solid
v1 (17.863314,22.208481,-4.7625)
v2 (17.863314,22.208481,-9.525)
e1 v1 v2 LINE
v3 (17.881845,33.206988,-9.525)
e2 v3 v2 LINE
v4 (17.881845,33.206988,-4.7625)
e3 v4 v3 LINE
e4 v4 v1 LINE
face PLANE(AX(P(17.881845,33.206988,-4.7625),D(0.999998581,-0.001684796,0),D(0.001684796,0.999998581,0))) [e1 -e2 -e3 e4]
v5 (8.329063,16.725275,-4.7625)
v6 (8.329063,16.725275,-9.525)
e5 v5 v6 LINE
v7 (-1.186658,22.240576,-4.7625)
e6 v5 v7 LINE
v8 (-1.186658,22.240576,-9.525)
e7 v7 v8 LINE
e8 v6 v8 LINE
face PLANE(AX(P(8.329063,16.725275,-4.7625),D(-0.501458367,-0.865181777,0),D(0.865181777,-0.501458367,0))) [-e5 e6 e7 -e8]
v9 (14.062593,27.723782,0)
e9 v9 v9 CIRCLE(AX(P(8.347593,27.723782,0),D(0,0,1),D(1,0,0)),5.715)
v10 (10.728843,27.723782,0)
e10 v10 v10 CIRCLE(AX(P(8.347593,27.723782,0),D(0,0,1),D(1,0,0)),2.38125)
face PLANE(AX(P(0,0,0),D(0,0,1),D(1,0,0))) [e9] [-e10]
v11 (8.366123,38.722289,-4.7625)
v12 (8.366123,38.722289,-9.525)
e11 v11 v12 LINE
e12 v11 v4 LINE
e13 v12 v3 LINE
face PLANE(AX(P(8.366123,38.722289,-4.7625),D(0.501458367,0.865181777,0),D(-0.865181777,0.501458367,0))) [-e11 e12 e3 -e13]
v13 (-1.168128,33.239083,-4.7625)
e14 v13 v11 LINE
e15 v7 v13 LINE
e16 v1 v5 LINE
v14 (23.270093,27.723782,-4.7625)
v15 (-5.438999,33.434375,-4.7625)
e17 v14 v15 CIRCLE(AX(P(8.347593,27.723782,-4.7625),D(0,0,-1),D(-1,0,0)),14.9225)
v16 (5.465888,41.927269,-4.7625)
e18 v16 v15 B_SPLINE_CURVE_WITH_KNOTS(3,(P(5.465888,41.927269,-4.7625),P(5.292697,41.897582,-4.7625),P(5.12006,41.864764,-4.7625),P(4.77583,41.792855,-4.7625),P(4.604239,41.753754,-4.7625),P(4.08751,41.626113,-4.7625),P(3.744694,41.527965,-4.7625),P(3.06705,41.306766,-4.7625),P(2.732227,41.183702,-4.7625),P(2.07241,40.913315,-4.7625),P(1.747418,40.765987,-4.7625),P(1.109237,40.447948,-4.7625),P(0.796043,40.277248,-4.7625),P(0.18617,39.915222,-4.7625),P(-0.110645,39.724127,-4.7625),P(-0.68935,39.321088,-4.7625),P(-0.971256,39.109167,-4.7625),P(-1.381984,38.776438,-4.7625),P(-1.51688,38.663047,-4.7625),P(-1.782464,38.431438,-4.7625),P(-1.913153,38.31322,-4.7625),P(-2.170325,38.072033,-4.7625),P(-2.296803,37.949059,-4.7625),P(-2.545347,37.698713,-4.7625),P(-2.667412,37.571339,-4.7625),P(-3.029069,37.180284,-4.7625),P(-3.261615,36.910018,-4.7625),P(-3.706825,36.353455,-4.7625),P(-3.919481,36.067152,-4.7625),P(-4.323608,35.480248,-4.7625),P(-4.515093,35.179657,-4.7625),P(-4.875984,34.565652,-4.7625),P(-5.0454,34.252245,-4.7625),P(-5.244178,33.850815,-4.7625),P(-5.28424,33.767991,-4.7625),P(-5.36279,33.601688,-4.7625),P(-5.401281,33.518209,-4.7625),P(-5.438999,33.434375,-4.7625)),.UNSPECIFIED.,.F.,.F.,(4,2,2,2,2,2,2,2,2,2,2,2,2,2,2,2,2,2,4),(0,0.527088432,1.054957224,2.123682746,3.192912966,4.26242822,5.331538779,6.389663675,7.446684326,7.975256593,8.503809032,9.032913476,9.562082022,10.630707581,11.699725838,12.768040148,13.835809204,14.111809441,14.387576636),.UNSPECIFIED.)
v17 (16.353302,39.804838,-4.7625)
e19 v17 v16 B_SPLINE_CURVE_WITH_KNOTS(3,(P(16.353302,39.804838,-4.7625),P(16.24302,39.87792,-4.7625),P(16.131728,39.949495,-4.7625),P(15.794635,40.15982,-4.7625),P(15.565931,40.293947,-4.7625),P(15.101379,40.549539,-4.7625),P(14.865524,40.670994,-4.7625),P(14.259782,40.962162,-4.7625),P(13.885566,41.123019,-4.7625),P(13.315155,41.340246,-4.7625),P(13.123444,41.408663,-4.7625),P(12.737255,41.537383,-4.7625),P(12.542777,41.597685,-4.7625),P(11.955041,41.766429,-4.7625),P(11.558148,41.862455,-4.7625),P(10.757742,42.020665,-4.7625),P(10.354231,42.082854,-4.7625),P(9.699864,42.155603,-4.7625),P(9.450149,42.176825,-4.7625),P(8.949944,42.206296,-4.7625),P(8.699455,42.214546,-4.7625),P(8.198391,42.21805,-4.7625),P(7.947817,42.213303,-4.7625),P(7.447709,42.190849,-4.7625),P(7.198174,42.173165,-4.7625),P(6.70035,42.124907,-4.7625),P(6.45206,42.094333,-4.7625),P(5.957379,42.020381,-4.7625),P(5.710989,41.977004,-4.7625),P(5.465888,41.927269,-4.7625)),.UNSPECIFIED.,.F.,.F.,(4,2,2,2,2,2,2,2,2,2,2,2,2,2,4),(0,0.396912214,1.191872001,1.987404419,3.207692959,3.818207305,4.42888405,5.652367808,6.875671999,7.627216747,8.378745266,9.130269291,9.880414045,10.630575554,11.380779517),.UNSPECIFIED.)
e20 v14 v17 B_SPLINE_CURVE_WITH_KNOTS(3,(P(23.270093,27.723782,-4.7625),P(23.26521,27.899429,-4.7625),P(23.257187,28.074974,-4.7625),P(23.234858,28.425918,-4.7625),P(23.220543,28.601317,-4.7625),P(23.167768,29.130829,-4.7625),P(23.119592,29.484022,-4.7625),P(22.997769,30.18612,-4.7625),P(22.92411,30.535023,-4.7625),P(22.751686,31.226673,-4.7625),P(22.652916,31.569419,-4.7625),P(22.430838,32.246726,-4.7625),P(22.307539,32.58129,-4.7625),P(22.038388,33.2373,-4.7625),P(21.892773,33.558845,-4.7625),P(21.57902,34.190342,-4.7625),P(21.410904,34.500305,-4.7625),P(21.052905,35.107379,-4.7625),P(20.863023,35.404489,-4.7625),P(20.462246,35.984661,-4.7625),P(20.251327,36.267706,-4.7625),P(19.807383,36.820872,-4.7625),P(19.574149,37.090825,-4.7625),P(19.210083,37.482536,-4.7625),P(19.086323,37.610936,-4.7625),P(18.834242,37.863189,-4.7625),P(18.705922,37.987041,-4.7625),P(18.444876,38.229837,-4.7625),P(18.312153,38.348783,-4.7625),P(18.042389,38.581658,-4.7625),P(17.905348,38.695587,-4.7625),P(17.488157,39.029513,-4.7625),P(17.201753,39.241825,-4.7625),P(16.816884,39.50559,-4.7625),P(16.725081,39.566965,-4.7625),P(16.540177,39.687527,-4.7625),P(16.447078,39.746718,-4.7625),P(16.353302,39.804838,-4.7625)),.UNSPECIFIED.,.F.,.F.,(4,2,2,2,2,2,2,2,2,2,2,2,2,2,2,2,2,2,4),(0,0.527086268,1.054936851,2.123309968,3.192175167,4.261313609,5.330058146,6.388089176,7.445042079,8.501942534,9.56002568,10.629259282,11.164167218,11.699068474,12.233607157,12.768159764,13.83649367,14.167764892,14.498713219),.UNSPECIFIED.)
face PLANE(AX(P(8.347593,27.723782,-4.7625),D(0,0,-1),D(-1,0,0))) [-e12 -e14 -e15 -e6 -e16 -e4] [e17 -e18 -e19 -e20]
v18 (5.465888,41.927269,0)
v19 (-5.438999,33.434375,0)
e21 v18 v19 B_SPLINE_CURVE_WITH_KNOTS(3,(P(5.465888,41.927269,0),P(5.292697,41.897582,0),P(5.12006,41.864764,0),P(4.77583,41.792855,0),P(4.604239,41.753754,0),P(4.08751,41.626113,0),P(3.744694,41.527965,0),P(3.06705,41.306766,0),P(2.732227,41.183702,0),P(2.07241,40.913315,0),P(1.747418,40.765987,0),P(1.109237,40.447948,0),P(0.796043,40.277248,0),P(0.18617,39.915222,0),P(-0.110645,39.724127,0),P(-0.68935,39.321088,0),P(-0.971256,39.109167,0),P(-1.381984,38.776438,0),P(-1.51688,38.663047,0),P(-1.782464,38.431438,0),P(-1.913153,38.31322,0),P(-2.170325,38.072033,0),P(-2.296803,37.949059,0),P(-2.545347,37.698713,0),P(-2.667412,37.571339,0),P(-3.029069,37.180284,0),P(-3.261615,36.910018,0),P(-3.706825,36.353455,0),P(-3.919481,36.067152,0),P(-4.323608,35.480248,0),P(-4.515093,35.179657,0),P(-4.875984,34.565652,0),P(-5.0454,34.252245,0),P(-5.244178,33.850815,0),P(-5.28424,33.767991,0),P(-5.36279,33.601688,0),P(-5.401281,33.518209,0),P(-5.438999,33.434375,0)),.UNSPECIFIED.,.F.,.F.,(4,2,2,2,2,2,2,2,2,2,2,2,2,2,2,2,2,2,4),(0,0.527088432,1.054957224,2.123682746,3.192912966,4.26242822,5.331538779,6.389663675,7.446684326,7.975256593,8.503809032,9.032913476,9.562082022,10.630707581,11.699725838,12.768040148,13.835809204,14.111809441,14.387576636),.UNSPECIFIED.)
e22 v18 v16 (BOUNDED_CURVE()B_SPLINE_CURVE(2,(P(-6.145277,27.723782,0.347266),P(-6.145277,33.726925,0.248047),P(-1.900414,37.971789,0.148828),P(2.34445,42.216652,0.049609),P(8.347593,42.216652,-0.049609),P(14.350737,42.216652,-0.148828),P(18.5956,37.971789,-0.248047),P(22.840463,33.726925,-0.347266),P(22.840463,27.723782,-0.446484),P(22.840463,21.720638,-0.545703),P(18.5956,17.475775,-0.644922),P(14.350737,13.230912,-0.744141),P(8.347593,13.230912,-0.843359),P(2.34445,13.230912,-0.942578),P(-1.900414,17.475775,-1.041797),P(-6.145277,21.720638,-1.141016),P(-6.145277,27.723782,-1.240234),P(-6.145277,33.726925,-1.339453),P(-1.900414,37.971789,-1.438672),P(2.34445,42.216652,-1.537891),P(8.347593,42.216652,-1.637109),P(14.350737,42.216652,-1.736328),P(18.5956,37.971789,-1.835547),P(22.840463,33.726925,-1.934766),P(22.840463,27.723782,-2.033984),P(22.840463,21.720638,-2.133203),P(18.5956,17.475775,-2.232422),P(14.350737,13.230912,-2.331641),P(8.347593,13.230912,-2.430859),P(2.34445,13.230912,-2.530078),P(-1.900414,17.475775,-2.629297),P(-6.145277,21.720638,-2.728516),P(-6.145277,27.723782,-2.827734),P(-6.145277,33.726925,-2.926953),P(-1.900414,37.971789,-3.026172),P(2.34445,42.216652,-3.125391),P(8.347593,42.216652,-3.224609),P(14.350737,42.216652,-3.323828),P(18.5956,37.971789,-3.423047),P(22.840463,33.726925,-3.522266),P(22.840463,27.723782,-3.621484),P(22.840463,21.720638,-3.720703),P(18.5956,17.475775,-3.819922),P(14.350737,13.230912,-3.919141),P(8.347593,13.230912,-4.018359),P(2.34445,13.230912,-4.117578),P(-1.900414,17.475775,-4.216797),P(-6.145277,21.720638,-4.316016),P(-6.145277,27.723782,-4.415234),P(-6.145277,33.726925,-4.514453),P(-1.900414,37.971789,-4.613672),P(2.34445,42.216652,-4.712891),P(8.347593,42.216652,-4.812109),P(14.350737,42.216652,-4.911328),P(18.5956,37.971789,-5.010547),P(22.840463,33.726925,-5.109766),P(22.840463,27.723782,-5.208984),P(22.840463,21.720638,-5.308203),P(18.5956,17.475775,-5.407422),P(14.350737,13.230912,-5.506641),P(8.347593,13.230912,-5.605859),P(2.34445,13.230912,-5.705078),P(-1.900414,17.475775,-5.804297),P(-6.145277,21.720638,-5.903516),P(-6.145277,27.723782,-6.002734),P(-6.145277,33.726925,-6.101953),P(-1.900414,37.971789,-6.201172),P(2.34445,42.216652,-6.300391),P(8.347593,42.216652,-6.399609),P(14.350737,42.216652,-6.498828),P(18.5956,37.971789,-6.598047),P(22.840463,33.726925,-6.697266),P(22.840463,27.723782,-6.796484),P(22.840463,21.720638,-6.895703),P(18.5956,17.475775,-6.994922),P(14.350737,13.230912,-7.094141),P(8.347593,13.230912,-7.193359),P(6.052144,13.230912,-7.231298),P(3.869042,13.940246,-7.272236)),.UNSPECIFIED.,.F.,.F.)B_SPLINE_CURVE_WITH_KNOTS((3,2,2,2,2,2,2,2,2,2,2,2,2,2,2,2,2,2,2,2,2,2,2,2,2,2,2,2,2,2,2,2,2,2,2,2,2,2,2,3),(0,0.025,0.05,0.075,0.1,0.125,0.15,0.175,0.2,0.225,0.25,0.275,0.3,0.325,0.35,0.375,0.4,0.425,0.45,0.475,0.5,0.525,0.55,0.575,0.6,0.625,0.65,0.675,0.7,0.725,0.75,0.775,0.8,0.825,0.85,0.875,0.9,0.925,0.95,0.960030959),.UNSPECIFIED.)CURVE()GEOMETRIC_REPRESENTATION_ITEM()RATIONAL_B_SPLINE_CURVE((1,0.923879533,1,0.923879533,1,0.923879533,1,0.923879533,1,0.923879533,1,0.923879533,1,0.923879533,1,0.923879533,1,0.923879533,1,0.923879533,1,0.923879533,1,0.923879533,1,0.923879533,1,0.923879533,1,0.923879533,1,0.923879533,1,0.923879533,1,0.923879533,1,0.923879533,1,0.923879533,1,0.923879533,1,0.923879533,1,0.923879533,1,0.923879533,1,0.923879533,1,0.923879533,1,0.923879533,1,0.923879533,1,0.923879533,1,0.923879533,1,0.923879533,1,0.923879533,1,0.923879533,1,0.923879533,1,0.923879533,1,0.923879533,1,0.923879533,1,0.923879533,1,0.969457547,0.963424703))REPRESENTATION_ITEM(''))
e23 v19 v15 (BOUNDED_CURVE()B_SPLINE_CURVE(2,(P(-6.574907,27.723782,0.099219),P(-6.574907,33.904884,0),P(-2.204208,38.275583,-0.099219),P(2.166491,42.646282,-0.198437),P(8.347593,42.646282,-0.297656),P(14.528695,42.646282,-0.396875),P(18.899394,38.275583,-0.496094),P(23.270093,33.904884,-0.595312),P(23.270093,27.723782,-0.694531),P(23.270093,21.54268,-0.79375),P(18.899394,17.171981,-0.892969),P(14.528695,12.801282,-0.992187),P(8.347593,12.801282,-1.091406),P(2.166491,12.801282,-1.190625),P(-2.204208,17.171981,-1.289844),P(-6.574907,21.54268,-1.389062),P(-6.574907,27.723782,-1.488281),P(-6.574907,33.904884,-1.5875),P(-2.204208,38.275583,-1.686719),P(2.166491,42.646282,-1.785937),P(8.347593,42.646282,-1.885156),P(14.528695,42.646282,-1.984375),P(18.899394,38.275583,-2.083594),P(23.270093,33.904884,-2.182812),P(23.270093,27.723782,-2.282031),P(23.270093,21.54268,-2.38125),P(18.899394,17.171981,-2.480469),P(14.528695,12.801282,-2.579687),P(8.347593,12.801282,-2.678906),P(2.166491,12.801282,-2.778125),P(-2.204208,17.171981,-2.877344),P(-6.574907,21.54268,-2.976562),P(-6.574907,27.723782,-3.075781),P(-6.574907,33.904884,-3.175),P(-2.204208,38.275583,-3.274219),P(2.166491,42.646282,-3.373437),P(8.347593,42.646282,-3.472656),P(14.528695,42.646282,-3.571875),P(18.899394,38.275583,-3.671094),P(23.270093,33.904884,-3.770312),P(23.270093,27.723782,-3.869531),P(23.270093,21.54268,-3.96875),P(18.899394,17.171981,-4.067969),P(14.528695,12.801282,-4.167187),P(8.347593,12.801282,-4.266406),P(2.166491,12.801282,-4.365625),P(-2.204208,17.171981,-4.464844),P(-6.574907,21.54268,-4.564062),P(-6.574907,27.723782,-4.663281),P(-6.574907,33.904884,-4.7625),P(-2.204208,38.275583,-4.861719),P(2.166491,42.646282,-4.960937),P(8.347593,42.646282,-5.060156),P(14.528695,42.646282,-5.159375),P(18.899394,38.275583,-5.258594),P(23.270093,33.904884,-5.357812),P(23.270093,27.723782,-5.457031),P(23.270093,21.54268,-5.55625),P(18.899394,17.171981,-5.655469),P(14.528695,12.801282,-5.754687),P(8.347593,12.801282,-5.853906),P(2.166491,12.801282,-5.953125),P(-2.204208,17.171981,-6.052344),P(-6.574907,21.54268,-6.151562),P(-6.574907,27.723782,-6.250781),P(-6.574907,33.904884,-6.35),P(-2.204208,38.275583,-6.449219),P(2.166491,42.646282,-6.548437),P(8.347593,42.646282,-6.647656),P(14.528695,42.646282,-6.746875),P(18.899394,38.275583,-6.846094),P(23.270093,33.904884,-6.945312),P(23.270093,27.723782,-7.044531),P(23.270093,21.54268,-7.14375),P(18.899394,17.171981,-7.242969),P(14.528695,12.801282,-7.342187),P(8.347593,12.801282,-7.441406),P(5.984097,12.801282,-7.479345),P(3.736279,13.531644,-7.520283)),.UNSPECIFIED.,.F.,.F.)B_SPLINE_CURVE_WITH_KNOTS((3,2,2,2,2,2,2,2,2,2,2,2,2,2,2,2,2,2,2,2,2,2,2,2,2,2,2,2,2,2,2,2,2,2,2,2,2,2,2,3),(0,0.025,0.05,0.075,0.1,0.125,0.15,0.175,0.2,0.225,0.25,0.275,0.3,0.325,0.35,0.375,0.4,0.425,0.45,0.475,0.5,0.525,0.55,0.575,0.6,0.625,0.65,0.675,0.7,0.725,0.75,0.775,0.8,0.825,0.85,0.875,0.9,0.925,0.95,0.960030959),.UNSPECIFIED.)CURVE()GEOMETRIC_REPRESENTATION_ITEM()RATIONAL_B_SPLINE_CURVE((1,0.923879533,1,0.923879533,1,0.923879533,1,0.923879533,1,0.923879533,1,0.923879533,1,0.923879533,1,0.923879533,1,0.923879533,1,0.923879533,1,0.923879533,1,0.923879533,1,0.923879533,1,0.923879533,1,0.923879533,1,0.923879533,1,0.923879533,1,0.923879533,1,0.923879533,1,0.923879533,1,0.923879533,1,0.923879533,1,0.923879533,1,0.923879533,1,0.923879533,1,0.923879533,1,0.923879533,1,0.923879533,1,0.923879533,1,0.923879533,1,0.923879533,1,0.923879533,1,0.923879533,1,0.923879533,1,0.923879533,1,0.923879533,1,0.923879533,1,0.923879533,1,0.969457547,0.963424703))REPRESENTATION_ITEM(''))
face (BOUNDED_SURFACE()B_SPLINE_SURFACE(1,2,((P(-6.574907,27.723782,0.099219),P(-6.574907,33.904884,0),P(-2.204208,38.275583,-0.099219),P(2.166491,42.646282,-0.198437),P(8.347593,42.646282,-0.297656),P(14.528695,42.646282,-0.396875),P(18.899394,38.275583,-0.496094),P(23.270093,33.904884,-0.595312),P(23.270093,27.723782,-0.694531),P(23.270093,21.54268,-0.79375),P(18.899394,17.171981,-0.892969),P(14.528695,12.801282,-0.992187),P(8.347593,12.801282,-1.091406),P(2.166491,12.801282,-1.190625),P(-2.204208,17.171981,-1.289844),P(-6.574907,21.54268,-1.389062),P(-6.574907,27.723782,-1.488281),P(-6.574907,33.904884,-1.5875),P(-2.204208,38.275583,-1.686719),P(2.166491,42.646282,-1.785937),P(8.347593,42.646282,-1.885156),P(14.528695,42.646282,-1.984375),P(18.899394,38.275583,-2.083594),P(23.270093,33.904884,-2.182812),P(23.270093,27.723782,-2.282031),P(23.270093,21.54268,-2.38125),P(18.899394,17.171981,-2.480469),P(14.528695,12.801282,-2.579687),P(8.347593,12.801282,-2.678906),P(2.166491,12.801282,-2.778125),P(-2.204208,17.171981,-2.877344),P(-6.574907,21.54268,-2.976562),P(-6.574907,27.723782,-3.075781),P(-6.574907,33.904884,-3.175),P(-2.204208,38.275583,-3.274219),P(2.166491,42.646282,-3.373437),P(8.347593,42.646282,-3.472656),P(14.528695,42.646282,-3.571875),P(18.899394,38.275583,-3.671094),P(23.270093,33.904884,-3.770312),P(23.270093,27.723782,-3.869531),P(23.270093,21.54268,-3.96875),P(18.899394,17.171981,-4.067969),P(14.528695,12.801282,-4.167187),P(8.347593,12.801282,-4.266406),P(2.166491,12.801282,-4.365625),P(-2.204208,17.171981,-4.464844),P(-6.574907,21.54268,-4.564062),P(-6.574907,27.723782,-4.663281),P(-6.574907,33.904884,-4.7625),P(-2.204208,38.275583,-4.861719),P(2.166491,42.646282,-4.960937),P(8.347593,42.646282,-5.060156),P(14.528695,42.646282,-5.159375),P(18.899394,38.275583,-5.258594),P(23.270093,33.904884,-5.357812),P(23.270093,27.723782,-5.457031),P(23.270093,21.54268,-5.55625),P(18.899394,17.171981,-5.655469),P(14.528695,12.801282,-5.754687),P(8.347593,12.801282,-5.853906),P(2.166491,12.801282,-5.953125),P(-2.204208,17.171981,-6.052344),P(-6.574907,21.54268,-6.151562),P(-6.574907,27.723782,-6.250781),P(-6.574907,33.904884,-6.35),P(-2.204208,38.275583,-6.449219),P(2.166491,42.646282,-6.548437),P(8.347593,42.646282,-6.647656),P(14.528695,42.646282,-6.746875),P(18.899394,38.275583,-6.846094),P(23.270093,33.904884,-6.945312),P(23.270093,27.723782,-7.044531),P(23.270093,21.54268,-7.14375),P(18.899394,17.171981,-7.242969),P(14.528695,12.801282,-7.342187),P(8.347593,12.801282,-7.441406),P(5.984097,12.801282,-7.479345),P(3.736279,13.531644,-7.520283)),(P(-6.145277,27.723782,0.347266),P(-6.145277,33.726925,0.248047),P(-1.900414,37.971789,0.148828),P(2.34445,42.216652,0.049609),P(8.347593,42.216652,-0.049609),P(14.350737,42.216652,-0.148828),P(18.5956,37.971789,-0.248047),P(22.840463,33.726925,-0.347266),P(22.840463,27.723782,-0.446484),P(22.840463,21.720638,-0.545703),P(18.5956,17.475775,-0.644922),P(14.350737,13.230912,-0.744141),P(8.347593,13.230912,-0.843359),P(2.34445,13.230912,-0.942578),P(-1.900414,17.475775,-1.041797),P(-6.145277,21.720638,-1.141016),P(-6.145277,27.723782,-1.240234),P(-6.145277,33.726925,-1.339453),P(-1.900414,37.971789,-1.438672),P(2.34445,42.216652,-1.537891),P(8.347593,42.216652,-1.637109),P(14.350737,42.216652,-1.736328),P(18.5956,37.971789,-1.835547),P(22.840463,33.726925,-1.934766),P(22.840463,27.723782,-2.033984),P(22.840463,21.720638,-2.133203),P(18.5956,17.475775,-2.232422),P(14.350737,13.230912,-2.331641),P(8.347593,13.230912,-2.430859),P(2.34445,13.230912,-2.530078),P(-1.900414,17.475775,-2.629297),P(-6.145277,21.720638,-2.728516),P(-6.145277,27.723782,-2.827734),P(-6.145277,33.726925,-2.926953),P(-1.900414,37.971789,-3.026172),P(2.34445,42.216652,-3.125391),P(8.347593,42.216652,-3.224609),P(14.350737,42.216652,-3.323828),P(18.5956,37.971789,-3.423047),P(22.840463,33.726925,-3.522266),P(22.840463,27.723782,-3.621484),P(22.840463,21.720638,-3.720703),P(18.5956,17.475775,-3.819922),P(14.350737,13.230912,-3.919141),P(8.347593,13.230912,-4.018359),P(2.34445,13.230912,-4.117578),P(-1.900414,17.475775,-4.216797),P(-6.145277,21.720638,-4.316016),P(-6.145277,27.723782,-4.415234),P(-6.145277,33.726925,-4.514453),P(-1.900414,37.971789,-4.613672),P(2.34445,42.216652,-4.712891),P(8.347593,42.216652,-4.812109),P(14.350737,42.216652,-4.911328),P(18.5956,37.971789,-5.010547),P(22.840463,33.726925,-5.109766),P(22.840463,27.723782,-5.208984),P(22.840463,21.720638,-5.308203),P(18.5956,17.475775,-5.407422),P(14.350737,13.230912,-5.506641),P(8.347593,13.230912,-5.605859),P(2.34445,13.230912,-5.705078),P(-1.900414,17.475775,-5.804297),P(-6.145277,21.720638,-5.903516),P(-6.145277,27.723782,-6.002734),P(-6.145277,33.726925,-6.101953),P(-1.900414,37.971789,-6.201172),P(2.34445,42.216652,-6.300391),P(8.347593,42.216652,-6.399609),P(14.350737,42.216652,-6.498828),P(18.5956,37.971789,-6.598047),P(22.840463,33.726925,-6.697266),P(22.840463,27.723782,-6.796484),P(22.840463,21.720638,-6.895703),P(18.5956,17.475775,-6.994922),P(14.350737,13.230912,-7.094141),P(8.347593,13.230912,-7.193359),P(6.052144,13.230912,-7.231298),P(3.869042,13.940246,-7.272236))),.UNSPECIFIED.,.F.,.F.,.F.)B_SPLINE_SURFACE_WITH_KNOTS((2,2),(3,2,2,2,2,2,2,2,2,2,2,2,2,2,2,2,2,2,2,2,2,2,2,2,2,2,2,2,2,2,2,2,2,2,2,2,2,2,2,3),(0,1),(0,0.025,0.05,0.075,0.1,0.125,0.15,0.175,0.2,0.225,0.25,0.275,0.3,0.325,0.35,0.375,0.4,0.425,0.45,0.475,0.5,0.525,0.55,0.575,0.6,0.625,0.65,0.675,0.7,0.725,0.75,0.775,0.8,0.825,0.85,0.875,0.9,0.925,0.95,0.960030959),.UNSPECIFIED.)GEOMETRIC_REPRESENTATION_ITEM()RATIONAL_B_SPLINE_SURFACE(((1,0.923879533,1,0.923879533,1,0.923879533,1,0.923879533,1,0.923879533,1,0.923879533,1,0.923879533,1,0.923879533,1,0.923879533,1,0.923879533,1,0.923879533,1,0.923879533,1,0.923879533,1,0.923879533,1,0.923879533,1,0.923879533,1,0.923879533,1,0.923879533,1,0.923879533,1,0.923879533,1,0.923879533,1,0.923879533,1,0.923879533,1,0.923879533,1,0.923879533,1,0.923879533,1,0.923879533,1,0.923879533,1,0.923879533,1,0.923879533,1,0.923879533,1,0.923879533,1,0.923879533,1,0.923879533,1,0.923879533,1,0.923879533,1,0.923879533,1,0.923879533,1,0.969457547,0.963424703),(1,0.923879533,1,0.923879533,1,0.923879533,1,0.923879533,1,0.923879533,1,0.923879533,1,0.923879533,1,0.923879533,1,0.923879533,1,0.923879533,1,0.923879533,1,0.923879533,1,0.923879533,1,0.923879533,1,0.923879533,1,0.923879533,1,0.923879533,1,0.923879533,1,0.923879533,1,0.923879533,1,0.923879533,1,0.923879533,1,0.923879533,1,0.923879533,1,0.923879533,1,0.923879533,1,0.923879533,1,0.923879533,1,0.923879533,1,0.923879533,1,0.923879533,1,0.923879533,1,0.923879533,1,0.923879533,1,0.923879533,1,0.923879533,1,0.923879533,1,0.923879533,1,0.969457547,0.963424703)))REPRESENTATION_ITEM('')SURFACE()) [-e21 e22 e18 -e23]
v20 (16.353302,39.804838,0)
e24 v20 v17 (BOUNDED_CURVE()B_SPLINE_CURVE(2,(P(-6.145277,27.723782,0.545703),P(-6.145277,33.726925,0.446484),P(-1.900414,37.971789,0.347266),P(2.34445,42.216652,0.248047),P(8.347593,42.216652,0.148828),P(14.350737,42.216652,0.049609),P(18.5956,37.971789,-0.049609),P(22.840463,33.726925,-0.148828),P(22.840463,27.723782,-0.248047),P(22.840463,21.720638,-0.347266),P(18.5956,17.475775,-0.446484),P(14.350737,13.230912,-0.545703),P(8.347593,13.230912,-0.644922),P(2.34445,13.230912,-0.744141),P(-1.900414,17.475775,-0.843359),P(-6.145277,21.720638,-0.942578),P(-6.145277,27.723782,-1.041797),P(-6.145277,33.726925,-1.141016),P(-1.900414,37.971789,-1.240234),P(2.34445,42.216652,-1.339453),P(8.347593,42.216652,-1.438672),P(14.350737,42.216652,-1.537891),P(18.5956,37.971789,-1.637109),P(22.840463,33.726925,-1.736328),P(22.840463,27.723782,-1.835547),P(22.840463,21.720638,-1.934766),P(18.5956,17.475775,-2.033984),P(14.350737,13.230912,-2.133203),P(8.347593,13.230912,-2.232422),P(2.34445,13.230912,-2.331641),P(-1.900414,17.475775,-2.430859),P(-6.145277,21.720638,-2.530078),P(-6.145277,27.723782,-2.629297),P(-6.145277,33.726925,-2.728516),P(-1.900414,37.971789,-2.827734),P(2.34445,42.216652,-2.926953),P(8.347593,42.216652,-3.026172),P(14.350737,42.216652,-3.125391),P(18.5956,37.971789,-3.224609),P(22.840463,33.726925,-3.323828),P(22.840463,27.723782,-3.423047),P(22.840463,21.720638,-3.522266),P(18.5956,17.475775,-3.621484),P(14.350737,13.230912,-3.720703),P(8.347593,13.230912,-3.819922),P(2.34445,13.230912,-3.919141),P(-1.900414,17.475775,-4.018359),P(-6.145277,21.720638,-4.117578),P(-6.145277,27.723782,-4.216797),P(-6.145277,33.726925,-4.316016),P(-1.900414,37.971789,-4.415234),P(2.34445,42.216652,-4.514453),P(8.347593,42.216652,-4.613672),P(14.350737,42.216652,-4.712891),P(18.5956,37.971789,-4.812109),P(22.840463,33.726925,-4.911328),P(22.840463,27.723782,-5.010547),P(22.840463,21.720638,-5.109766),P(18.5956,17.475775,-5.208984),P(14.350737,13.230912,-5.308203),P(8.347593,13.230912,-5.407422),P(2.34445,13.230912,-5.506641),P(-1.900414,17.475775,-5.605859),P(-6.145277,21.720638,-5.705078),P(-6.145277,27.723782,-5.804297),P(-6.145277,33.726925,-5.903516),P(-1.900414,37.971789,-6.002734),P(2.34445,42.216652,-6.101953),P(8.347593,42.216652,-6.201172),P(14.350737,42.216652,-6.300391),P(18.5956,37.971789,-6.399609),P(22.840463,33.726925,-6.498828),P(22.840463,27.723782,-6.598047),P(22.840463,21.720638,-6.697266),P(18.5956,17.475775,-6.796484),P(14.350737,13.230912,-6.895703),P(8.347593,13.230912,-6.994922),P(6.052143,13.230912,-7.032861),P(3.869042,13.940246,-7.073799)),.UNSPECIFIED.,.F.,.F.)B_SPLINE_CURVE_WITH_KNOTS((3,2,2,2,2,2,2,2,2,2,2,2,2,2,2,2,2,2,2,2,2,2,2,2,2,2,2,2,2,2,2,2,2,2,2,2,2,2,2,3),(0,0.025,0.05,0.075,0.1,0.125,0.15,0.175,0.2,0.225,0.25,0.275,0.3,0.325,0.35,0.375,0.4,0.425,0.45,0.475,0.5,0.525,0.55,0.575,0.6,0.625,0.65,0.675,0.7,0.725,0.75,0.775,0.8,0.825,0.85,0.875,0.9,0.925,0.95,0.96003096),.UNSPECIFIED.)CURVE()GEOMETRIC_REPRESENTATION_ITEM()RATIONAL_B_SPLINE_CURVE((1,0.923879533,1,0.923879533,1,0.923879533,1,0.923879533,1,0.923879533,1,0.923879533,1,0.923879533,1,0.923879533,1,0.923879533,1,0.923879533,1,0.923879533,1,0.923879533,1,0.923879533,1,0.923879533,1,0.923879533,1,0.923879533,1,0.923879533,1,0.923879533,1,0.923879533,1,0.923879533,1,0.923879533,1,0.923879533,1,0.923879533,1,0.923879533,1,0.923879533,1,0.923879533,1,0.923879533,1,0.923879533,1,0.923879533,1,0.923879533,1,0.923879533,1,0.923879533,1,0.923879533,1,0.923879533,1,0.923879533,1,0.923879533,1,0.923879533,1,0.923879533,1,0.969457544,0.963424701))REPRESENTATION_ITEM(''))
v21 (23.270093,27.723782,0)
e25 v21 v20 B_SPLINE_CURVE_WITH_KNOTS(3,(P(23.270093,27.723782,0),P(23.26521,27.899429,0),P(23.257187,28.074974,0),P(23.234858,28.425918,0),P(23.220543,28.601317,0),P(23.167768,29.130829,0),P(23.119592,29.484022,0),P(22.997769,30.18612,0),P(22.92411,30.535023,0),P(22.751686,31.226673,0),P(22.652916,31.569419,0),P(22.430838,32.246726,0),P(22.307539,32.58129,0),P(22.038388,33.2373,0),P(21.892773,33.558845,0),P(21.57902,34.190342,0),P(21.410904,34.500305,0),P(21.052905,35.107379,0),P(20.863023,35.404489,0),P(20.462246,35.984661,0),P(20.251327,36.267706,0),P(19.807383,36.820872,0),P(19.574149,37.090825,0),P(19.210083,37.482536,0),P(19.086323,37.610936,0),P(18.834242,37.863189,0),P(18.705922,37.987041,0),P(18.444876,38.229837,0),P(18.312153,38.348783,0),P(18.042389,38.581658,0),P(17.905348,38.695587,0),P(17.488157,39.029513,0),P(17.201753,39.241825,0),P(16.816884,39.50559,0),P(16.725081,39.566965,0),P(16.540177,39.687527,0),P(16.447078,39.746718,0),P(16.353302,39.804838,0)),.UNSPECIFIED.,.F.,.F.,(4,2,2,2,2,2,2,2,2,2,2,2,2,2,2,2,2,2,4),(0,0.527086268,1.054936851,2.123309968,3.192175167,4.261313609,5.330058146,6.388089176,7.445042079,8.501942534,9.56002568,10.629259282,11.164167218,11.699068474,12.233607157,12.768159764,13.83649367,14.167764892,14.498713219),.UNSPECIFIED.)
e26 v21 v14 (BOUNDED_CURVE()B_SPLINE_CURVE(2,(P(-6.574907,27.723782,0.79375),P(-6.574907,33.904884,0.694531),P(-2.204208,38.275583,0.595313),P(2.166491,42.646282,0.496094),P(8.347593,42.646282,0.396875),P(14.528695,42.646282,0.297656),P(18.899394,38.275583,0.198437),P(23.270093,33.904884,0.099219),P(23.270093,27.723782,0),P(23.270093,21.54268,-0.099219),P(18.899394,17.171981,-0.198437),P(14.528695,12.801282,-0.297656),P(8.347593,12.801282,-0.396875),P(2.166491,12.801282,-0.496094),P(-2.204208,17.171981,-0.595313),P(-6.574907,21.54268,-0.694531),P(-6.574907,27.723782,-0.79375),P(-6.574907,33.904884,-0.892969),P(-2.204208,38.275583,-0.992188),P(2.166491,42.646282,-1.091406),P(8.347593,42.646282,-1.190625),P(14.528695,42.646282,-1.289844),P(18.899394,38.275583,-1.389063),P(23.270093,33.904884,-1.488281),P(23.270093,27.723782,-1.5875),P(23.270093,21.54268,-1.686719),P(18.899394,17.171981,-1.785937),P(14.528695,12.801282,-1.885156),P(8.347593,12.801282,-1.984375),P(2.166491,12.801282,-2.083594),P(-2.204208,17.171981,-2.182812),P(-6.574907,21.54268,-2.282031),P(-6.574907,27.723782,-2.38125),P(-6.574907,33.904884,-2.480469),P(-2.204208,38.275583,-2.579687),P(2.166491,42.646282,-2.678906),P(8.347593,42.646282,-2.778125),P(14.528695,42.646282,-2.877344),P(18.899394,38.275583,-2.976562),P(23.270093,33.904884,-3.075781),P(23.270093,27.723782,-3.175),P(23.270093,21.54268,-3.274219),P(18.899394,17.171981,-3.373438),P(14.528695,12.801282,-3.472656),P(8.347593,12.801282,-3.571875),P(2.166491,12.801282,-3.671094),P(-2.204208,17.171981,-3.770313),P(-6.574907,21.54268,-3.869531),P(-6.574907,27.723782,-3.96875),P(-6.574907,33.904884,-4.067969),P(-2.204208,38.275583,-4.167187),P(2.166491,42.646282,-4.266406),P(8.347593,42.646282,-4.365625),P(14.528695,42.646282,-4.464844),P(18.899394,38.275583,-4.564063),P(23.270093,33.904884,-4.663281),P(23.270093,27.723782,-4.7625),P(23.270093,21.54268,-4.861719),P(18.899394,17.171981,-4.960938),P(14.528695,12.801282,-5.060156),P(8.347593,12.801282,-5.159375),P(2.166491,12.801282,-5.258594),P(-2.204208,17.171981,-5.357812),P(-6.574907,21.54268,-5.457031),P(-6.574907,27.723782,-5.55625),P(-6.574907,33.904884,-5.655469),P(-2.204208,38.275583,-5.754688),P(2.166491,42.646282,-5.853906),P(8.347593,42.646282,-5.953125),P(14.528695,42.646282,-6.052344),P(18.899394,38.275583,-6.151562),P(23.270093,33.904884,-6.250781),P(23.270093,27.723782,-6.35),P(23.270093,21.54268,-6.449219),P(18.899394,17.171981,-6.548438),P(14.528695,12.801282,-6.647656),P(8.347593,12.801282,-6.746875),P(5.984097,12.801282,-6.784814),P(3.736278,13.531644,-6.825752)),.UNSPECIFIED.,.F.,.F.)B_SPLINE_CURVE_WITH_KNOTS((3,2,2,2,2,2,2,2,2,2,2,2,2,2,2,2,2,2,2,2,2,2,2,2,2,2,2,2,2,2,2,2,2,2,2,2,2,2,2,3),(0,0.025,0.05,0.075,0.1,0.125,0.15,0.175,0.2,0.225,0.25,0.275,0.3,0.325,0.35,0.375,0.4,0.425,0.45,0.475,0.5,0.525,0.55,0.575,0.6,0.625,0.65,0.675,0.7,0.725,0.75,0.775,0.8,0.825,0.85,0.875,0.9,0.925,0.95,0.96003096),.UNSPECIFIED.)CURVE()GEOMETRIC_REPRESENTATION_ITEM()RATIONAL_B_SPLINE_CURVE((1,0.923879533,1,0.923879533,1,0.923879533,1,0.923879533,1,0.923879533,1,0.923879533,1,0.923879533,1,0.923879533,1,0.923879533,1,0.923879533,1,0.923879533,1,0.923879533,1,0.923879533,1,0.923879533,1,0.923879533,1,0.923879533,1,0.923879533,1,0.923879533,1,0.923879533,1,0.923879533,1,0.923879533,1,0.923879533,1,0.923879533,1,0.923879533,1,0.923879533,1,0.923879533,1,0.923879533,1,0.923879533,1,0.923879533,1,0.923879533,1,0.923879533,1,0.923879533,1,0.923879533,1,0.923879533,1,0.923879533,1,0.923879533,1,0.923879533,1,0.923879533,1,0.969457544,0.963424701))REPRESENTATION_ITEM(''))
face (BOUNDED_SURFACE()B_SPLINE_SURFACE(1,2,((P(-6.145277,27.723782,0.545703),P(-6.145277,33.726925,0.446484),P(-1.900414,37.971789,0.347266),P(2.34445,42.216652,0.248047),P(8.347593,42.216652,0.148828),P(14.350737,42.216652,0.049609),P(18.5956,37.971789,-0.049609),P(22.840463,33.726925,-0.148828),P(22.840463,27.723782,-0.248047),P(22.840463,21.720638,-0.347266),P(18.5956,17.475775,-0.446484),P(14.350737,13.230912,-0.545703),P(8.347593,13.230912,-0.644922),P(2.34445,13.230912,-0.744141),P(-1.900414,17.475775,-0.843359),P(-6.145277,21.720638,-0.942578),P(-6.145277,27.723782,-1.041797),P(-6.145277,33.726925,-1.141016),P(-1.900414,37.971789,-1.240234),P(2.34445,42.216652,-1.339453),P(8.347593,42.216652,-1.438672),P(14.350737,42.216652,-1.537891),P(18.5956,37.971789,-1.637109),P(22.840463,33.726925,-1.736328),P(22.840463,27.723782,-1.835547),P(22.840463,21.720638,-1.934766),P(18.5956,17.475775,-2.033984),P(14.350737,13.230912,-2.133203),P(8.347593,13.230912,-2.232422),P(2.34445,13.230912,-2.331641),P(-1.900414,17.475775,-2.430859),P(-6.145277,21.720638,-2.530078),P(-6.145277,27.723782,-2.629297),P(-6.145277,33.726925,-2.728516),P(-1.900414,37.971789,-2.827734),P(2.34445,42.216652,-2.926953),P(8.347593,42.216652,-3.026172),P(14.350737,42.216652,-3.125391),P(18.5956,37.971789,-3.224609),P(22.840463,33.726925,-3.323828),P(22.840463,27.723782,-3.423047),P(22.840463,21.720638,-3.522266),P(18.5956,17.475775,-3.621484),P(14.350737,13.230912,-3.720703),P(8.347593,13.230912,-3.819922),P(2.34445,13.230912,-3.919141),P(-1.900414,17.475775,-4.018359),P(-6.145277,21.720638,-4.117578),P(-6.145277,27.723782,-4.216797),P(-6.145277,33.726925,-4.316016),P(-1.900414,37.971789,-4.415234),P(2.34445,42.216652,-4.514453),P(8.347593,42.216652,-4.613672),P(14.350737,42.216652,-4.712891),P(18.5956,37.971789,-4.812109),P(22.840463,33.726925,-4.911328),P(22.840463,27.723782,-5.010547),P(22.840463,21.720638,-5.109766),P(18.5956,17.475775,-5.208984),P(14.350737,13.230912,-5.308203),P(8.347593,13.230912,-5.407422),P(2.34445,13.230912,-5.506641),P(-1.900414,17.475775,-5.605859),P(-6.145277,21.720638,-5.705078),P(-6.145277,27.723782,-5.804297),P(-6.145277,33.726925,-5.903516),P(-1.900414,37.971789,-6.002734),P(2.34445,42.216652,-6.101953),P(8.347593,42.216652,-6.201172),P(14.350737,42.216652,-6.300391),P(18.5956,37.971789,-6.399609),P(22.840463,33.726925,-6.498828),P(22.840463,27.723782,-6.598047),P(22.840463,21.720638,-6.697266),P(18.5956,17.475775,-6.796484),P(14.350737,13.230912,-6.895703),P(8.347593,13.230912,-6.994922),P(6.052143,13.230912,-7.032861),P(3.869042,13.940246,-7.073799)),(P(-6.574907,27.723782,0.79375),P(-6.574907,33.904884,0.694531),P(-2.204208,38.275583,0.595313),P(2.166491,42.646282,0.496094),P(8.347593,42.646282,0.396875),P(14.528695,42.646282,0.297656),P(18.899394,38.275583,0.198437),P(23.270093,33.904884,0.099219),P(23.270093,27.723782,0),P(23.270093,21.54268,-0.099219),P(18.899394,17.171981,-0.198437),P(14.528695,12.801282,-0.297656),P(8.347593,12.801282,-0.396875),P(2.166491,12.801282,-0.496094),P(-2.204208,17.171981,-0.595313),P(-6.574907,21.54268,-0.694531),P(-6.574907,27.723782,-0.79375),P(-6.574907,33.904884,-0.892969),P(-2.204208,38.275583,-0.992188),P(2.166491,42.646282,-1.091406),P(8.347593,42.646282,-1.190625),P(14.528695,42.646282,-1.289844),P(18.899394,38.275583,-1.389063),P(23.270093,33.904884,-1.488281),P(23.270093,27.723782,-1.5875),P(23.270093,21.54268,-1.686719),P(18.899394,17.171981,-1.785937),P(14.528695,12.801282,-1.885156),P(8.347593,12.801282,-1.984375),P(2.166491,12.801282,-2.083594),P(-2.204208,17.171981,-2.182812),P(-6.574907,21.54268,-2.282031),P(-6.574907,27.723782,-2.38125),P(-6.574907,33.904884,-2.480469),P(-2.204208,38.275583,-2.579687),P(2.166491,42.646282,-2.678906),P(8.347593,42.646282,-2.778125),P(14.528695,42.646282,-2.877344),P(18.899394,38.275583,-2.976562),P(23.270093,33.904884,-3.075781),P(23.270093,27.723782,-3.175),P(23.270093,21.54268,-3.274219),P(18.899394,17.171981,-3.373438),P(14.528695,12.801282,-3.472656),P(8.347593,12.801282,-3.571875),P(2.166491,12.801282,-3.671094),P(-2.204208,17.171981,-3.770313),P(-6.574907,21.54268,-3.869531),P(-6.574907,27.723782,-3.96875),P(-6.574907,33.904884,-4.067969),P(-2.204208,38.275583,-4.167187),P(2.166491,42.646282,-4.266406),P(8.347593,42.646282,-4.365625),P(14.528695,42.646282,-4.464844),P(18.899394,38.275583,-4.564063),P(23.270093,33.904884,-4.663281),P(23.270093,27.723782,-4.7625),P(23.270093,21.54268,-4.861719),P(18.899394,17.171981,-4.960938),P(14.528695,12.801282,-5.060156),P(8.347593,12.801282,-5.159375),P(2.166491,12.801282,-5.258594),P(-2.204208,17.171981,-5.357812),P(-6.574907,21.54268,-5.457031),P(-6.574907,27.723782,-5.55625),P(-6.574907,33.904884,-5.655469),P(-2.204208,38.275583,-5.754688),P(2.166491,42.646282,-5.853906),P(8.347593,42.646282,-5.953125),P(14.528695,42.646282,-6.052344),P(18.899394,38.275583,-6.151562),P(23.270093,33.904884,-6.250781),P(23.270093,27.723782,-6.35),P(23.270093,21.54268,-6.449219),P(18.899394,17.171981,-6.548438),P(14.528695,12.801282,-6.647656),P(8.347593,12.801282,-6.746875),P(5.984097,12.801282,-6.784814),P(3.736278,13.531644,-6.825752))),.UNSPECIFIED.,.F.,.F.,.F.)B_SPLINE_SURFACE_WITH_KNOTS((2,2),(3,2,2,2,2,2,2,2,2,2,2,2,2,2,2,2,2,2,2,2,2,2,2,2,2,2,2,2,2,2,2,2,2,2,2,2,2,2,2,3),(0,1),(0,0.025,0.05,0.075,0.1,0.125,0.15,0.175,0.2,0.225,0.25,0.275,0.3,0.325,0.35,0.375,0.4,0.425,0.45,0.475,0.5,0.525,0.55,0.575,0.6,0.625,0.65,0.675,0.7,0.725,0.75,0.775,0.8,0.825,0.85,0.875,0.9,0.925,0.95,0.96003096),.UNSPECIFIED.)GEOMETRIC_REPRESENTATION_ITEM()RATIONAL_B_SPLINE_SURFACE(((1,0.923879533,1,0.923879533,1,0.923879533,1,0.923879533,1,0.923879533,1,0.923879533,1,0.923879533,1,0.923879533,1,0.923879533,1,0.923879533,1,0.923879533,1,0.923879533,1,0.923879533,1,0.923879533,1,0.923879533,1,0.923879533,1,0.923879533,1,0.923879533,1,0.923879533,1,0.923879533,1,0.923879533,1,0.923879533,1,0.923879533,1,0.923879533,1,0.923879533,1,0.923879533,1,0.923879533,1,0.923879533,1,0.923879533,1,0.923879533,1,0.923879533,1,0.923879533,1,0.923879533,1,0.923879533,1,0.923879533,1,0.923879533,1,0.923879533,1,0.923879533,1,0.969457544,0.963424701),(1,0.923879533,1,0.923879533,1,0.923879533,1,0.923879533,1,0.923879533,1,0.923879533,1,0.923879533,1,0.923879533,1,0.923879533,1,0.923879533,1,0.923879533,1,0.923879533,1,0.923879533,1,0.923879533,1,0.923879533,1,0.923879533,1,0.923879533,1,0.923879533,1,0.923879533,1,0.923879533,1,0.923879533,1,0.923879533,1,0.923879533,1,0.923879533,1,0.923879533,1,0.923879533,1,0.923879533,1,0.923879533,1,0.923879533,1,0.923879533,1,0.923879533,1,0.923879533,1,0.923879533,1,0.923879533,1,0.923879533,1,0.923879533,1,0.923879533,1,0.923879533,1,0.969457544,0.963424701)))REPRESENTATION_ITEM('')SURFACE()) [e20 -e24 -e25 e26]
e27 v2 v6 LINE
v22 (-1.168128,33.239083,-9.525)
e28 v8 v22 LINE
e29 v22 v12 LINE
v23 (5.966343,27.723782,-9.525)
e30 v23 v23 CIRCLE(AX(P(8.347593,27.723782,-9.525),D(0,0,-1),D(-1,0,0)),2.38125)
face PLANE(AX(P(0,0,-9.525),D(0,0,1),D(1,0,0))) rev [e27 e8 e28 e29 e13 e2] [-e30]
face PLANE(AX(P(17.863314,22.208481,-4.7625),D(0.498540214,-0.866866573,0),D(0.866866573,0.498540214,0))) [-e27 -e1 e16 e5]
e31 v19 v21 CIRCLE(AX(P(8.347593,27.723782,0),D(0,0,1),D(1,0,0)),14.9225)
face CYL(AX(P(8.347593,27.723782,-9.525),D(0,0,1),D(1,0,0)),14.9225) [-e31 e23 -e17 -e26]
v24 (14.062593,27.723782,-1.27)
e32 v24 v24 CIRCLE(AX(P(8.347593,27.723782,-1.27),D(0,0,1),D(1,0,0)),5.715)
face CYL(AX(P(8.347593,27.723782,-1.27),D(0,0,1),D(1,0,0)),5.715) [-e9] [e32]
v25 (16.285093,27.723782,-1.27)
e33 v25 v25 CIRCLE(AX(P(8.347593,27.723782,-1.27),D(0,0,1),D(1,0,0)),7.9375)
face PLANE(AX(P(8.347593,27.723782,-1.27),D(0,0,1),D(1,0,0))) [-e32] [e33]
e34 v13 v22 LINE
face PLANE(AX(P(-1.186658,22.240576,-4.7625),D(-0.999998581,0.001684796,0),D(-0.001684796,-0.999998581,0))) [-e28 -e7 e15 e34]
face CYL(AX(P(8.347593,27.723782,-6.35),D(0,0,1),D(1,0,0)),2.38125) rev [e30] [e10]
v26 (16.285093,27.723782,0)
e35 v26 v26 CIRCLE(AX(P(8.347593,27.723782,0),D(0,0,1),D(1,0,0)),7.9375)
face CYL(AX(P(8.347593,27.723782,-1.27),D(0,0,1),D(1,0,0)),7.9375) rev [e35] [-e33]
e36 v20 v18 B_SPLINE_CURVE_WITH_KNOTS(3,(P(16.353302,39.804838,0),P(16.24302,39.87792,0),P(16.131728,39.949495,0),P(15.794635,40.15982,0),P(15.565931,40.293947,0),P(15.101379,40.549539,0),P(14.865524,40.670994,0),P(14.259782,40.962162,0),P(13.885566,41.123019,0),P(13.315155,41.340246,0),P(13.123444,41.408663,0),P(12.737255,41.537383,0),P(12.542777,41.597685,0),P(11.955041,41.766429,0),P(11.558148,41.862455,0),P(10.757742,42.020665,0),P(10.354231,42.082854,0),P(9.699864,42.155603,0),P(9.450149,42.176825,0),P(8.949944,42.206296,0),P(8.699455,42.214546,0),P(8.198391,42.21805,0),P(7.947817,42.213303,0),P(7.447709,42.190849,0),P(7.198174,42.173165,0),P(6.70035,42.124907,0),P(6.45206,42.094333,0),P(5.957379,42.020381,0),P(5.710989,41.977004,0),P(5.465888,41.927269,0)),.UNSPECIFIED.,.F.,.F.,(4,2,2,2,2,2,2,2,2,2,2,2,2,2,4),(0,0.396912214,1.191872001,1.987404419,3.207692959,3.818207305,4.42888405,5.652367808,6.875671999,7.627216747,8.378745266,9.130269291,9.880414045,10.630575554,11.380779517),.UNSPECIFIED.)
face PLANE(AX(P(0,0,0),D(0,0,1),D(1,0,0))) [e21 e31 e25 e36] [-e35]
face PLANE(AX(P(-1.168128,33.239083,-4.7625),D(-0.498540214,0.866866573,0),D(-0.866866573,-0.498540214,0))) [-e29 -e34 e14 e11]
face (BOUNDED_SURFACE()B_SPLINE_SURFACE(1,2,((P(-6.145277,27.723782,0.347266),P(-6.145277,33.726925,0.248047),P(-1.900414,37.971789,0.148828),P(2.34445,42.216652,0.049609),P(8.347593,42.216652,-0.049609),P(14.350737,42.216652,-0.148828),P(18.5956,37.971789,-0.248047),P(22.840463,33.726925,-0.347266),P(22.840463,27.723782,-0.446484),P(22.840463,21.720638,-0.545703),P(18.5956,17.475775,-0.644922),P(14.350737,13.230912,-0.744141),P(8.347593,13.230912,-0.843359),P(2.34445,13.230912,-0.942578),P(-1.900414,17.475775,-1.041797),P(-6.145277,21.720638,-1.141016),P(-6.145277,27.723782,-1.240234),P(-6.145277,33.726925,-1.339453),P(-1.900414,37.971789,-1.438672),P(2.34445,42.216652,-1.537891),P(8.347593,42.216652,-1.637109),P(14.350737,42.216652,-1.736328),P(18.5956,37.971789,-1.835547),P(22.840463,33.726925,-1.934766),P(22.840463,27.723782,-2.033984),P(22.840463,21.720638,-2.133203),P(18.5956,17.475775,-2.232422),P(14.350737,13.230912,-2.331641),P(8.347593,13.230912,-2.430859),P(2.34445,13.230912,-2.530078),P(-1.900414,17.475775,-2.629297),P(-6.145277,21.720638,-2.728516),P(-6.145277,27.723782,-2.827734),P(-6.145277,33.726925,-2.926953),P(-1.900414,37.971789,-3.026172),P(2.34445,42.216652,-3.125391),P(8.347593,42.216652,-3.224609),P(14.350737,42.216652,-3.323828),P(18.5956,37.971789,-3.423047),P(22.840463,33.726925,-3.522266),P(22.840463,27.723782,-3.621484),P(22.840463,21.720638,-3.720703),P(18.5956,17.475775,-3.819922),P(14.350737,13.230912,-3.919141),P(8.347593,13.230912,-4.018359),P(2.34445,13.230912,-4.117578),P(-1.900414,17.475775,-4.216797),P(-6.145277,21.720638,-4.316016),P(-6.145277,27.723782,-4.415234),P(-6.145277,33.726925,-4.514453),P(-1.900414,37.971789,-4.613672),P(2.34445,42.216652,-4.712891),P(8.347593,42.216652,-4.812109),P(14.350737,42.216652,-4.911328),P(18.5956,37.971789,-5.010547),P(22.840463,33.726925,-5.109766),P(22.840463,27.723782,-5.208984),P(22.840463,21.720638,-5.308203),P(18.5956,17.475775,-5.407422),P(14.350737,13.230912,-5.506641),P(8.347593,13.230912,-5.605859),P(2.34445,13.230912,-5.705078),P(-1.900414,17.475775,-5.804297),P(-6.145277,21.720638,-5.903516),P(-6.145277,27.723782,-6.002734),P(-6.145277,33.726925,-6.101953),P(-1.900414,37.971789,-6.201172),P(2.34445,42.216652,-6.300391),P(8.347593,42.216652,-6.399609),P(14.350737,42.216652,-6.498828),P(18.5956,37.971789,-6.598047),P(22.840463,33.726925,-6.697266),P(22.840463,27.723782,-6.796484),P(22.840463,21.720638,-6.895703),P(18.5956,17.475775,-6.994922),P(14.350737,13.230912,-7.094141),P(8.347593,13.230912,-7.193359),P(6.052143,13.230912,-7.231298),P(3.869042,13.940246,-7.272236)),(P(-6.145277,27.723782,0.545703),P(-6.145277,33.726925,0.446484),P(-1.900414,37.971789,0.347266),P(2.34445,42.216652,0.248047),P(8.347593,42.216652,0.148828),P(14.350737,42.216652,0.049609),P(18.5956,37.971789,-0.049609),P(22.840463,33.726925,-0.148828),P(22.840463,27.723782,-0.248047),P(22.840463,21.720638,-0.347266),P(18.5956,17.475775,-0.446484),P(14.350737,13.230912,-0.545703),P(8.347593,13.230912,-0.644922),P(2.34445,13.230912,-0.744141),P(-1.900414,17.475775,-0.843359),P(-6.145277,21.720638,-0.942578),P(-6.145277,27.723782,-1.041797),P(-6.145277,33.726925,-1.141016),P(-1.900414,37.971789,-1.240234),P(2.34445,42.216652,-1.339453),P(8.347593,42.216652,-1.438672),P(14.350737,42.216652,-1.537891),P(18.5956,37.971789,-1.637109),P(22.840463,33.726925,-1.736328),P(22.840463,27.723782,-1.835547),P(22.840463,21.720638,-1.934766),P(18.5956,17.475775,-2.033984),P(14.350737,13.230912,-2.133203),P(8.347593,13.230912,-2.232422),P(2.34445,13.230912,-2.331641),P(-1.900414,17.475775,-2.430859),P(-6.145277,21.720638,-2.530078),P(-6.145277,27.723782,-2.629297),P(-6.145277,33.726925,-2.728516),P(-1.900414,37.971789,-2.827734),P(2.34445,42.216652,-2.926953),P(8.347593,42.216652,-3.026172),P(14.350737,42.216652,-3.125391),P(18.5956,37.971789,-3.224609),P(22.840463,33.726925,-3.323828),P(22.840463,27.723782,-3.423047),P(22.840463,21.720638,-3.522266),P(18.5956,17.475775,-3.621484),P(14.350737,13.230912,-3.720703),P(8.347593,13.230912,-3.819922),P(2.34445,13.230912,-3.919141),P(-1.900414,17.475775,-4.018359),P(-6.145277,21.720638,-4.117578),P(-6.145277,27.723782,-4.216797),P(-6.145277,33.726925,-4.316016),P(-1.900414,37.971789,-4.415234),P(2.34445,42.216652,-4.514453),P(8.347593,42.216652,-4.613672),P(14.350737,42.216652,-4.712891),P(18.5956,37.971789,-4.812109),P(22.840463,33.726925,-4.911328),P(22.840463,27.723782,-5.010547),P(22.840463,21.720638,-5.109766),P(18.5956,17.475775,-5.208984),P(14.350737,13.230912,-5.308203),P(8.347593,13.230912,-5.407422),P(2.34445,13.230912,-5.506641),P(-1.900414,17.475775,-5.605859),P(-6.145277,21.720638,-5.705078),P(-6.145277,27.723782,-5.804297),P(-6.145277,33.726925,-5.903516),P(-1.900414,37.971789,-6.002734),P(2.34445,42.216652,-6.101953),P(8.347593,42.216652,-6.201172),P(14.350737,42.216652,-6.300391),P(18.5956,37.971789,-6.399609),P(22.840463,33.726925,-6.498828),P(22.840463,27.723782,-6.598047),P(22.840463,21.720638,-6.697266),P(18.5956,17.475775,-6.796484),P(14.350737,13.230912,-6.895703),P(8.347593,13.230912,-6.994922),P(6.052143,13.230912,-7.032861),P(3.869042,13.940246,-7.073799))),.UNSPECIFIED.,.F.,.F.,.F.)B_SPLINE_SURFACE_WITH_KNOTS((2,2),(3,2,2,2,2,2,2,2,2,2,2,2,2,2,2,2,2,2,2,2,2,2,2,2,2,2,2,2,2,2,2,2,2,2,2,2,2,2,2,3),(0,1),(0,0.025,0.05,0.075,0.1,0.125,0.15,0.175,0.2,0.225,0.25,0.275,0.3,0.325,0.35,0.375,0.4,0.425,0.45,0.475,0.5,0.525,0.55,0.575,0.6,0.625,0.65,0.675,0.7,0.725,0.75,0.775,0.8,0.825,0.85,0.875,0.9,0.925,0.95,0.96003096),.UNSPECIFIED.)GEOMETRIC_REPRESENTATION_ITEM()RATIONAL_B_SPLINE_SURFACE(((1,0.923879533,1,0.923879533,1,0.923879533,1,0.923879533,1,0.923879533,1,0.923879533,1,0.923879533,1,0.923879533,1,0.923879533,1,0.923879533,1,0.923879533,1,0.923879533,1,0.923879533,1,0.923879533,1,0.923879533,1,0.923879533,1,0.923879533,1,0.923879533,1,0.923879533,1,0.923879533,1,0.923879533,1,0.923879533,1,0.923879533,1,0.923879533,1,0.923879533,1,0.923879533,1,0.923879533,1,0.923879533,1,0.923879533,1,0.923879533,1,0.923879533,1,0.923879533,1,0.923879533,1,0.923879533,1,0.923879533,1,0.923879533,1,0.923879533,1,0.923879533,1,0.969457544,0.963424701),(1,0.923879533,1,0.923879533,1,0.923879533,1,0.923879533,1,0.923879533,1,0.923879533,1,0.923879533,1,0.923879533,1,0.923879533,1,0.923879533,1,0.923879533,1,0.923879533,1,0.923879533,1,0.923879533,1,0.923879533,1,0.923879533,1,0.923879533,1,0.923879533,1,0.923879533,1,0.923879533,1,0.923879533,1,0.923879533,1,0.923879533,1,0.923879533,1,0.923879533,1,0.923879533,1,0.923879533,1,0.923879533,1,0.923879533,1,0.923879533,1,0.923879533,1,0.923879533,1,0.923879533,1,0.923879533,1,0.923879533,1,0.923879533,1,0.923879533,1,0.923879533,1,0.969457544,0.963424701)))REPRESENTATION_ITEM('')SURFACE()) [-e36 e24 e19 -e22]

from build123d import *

# Parameters (mm, degrees)
SKETCH3_R           = 14.9225
BOSS_EXTRUDE1_DEPTH = 9.525
SKETCH11_R          = 2.38125
CUT_EXTRUDE3_DEPTH  = 6.35
SKETCH12_R          = 7.9375
SKETCH12_R_2        = 5.715
CUT_EXTRUDE4_DEPTH  = 1.27
THREAD1_PITCH       = 1.5875
CUT_EXTRUDE5_START  = -6.35
SKETCH13_R          = 2.38125
CUT_EXTRUDE5_DEPTH  = 6.35
CUT_EXTRUDE6_START  = -4.7625
SKETCH14_R          = 14.9225
CUT_EXTRUDE6_DEPTH  = 4.7625


with BuildPart() as part:
    # Sketch3 → Boss-Extrude1 (new body)
    with BuildSketch(Plane.XY):
        with Locations((8.347593151, 27.723781851)):
            Circle(SKETCH3_R)
    extrude(amount=-BOSS_EXTRUDE1_DEPTH)

    # Sketch11 → Cut-Extrude3 (cut)
    with BuildSketch(Plane.XY):
        with Locations((8.347593151, 27.723781851)):
            Circle(SKETCH11_R)
    extrude(amount=-CUT_EXTRUDE3_DEPTH, mode=Mode.SUBTRACT)

    # Sketch12 → Cut-Extrude4 (cut)
    with BuildSketch(Plane.XY):
        with Locations((8.347593151, 27.723781851)):
            Circle(SKETCH12_R)
        with Locations((8.347593151, 27.723781851)):
            Circle(SKETCH12_R_2, mode=Mode.SUBTRACT)
    extrude(amount=-CUT_EXTRUDE4_DEPTH, mode=Mode.SUBTRACT)

    # Thread1: the profile of Thread Profile1 profile screwed along a right-hand helix of 4.8 turns, 8 arcs to a turn; built about Z, then put on its axis
    thread1_z = Axis((0, 0, 0), (0, 0, 1))
    thread1_corners = [(14.9228, 0, -0.000173205), (14.9228, 0, 0.694704453), (14.492870212, 0, 0.446484374), (14.492870212, 0, 0.248046874)]
    with BuildLine(mode=Mode.PRIVATE) as thread1_profile:
        Line(thread1_corners[0], thread1_corners[1])
        Line(thread1_corners[1], thread1_corners[2])
        Line(thread1_corners[2], thread1_corners[3])
        Line(thread1_corners[3], thread1_corners[0])
    thread1_cap = Face(thread1_profile.wire())
    thread1_turn_angles = [0, 22.5, 45, 67.5, 90, 112.5, 135, 157.5, 180, 202.5, 225, 247.5, 270, 292.5, 315, 337.5, 360]
    thread1_turn_weights = [1, 0.9238795325112867, 1, 0.9238795325112867, 1, 0.9238795325112867, 1, 0.9238795325112867, 1, 0.9238795325112867, 1, 0.9238795325112867, 1, 0.9238795325112867, 1, 0.9238795325112867, 1]
    thread1_turn_rails = [Edge.make_bspline([Vector(p[0], p[1], 0).rotate(thread1_z, thread1_turn_angles[k]) / thread1_turn_weights[k] + Vector(0, 0, p[2] + THREAD1_PITCH * thread1_turn_angles[k] / 360) for k in range(17)], [0, 0, 0, 1, 1, 2, 2, 3, 3, 4, 4, 5, 5, 6, 6, 7, 7, 8, 8, 8], 2, thread1_turn_weights) for p in thread1_corners]
    thread1_turn_sides = [Face.make_surface_from_curves(thread1_turn_rails[p[0]], thread1_turn_rails[p[1]]) for p in [(0, 1), (1, 2), (2, 3), (3, 0)]]
    thread1_last_angles = [1440, 1462.5, 1485, 1507.5, 1530, 1552.5, 1575, 1597.5, 1620, 1642.5, 1665, 1687.5, 1710, 1719, 1728]
    thread1_last_weights = [1, 0.9238795325112867, 1, 0.9238795325112867, 1, 0.9238795325112867, 1, 0.9238795325112867, 1, 0.9238795325112867, 1, 0.9238795325112867, 1, 0.9876883405951378, 1]
    thread1_last_rails = [Edge.make_bspline([Vector(p[0], p[1], 0).rotate(thread1_z, thread1_last_angles[k]) / thread1_last_weights[k] + Vector(0, 0, p[2] + THREAD1_PITCH * thread1_last_angles[k] / 360) for k in range(15)], [0, 0, 0, 1, 1, 2, 2, 3, 3, 4, 4, 5, 5, 6, 6, 7, 7, 7], 2, thread1_last_weights) for p in thread1_corners]
    thread1_last_sides = [Face.make_surface_from_curves(thread1_last_rails[p[0]], thread1_last_rails[p[1]]) for p in [(0, 1), (1, 2), (2, 3), (3, 0)]]
    thread1 = Plane(origin=(8.347593151, 27.723781851, 0.79375), x_dir=(-1, 0, 0), z_dir=(0, 0, -1)) * Solid(Shell([*[p.moved(Location((0, 0, THREAD1_PITCH * i))) for i in range(4) for p in thread1_turn_sides], *thread1_last_sides, thread1_cap, thread1_cap.rotate(thread1_z, 1728).moved(Location((0, 0, THREAD1_PITCH * 1728 / 360)))]))
    add(thread1, mode=Mode.SUBTRACT)

    # Sketch13 → Cut-Extrude5 (cut)
    with BuildSketch(Plane(origin=(0, 0, -9.525), x_dir=(-1, 0, 0), z_dir=(0, 0, -1)).offset(CUT_EXTRUDE5_START)):
        with Locations(Location((-8.347593151, 27.723781851, 0), (0, 0, 180))):
            Circle(SKETCH13_R)
    extrude(amount=CUT_EXTRUDE5_DEPTH, mode=Mode.SUBTRACT)

    # Sketch14 → Cut-Extrude6 (cut)
    with BuildSketch(Plane(origin=(0, 0, -9.525), x_dir=(-1, 0, 0), z_dir=(0, 0, -1)).offset(CUT_EXTRUDE6_START)):
        with Locations((-8.347593151, 27.723781851)):
            Circle(SKETCH14_R)
        Polygon((1.186658464, 22.240576024), (1.168128197, 33.239083042), (-8.366123418, 38.722288869), (-17.881844766, 33.206987678), (-17.863314499, 22.20848066), (-8.329062884, 16.725274833), align=None, mode=Mode.SUBTRACT)
    extrude(amount=CUT_EXTRUDE6_DEPTH, mode=Mode.SUBTRACT)


solid = part.part
